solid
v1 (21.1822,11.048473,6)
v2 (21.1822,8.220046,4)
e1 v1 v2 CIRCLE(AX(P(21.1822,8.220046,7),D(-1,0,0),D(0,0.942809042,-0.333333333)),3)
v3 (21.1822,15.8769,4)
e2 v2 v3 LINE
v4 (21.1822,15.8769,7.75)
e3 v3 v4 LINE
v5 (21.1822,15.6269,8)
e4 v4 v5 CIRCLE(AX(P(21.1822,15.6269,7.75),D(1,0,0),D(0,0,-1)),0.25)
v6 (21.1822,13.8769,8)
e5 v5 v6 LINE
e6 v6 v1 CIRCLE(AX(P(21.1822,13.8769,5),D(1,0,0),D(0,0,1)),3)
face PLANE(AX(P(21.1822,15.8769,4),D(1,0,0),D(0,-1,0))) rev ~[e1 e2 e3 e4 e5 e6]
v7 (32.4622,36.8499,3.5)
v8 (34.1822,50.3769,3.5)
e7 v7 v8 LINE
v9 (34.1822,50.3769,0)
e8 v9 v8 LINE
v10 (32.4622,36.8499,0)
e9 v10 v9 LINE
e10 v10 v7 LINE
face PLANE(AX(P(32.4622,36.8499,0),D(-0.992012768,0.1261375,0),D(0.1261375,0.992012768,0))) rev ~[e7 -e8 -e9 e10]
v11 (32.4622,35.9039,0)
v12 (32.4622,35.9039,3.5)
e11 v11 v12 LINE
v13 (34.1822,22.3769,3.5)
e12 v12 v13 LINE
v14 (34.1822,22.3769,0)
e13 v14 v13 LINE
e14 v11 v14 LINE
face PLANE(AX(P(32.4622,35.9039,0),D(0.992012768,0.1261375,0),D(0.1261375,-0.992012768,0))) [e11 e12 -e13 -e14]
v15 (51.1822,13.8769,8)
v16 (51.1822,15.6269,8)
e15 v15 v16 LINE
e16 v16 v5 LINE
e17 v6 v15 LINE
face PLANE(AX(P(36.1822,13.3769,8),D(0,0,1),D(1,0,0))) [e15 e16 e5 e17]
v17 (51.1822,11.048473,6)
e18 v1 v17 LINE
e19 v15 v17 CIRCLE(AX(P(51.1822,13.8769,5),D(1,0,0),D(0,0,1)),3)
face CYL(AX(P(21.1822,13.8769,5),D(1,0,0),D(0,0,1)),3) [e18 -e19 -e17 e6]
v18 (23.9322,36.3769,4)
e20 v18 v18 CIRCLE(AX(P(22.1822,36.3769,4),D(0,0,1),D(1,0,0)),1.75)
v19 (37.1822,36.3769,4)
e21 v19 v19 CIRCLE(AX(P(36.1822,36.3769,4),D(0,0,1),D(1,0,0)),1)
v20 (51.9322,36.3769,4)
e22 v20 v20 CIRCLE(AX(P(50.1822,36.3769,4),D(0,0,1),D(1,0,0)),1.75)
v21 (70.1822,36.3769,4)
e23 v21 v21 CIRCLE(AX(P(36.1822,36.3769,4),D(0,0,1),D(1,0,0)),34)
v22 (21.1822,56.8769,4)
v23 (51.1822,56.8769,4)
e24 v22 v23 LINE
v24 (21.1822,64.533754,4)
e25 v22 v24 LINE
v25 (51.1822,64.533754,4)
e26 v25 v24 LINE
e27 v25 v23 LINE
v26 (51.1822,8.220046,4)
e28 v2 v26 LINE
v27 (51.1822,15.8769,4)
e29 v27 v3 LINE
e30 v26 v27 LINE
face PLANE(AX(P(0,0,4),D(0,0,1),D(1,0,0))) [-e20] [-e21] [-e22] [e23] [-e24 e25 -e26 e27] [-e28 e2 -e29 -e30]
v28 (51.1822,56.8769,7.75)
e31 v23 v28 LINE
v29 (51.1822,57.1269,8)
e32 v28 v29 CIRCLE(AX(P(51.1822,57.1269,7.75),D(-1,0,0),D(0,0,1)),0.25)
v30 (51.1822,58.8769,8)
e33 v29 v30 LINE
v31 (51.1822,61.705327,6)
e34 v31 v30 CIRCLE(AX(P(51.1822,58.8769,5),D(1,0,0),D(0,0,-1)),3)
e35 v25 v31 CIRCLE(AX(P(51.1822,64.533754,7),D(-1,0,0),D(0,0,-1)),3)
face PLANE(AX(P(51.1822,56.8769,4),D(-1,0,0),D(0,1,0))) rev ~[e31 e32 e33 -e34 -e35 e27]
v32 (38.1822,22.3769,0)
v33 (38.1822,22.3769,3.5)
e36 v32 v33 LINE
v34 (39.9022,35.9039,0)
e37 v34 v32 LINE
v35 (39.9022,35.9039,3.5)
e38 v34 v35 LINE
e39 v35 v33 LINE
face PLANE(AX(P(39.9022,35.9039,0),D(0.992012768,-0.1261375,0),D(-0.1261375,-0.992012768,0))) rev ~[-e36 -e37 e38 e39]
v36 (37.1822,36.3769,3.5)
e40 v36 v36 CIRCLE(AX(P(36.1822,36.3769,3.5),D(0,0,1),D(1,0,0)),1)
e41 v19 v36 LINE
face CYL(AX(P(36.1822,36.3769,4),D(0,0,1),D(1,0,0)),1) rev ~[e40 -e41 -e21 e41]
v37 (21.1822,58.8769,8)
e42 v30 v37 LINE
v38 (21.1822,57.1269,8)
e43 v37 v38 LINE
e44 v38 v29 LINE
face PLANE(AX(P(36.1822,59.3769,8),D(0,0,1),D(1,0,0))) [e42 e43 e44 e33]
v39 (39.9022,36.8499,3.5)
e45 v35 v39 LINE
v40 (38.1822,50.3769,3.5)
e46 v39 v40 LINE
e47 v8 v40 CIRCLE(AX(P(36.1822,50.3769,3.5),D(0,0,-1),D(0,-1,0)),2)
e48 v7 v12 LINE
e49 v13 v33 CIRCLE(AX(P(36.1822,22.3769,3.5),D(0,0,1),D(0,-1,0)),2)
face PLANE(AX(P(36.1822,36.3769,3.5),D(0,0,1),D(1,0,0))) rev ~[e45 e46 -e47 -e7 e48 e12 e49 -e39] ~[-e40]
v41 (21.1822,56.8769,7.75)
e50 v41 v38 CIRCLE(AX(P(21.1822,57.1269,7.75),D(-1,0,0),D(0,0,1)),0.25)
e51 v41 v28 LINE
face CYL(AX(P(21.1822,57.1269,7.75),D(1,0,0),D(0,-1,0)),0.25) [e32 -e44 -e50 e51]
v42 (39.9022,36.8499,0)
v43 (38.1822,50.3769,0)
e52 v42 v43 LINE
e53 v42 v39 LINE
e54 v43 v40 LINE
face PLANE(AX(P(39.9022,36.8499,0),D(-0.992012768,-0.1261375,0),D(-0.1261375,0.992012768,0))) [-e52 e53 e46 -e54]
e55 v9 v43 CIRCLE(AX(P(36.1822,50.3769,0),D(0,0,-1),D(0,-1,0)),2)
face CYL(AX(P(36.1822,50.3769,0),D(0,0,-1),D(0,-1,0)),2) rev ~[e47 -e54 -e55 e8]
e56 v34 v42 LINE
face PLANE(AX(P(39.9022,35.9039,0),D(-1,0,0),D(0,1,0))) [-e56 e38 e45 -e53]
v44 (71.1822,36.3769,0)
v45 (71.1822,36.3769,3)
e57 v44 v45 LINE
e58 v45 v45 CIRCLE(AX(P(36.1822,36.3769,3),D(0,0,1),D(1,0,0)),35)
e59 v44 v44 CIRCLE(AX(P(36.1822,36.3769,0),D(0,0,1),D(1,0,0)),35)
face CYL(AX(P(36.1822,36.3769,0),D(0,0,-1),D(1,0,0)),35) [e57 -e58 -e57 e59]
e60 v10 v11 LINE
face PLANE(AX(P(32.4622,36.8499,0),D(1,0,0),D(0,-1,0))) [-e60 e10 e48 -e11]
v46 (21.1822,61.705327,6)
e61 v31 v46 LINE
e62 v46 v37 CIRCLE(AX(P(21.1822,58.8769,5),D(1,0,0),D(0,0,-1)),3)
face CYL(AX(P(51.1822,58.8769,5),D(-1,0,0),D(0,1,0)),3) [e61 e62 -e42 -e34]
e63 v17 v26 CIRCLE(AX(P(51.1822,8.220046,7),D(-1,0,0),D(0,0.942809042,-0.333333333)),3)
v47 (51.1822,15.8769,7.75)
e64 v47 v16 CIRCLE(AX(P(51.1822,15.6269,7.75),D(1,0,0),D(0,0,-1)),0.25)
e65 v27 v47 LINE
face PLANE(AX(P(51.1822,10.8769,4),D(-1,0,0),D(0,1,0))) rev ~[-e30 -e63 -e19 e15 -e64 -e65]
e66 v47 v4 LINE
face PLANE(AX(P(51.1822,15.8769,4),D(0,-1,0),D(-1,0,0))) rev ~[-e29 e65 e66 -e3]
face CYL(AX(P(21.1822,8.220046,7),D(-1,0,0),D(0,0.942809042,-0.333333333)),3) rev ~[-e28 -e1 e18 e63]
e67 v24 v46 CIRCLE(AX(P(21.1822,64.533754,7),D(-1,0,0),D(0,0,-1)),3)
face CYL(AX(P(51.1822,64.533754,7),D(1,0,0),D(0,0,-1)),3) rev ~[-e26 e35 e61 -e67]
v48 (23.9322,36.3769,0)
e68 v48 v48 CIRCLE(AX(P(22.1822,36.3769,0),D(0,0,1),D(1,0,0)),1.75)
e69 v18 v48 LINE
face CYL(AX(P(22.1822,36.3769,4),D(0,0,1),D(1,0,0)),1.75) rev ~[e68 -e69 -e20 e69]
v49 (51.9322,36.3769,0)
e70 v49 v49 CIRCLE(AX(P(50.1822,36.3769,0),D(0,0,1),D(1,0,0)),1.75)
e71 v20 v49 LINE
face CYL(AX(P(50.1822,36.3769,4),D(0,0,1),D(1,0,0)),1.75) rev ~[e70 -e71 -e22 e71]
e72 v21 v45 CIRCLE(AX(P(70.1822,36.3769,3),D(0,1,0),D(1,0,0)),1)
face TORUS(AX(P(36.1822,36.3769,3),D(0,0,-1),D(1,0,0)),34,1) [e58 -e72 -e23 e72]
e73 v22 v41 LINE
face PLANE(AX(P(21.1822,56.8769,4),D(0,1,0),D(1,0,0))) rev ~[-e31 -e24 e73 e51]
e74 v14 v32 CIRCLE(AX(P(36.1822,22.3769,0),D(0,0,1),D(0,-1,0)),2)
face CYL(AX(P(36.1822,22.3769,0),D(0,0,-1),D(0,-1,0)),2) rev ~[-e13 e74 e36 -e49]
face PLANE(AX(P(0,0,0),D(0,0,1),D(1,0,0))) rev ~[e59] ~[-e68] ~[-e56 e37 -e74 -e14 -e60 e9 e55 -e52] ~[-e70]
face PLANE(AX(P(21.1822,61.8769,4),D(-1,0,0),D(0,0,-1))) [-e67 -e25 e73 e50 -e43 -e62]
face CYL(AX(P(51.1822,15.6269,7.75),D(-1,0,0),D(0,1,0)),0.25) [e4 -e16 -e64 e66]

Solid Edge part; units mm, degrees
sketch "Sketch1" plane through (0, 0, 0) normal (0, 0, 1) x (1, 0, 0)
  circle A0 centre (36.1822, 36.3769) radius 35
  circle A1 centre (36.1822, 36.3769) radius 35
extrude "Protrusion1" add sketch "Sketch1" along normal blind 4
sketch "Sketch2" plane through (36.1822, 36.3769, 4) normal (0, 0, 1) x (1, 0, 0)
  circle A0 centre (14, 0) radius 1.75
  circle A1 centre (-14, 0) radius 1.75
  circle A2 centre (0, 0) radius 1
  dimension "D1" = 14
  dimension "D2" = 14
  dimension "D3" = 3.5
  dimension "D4" = 2
extrude "Cutout1" cut sketch "Sketch2" against normal through all
sketch "Sketch3" plane through (36.1822, 36.3769, 0) normal (0, 0, -1) x (0, -1, 0)
  line L0 (0.473, 3.72) -> (14, 2)
  arc A0 (14, 2) -> (14, -2) centre (14, 0) cw
  line L1 (0.473, -3.72) -> (14, -2)
  line L2 (0.473, -3.72) -> (-0.473, -3.72)
  line L3 (-0.473, -3.72) -> (-14, -2)
  arc A1 (-14, 2) -> (-14, -2) centre (-14, 0) ccw
  line L4 (-0.473, 3.72) -> (-14, 2)
  line L5 (-0.473, 3.72) -> (0.473, 3.72)
  dimension "D1" = 7.5
  dimension "D2" = 2
  dimension "D3" = 14
extrude "Enlèvement_matière_2" cut sketch "Sketch3" against normal blind 3.5
sketch "Sketch4" plane through (36.1822, 36.3769, 4) normal (0, 0, 1) x (0, 1, 0)
  line L0 (20.5, -15) -> (25.5, -15)
  line L1 (25.5, -15) -> (25.5, 15)
  line L2 (25.5, 15) -> (20.5, 15)
  line L3 (20.5, 15) -> (20.5, -15)
  line L4 (-25.5, -15) -> (-20.5, -15)
  line L5 (-20.5, -15) -> (-20.5, 15)
  line L6 (-20.5, 15) -> (-25.5, 15)
  line L7 (-25.5, 15) -> (-25.5, -15)
  dimension "D1" = 41
  dimension "D2" = 5
  dimension "D3" = 30
  dimension "D4" = 20.5
  dimension "D5" = 20.5
  dimension "D6" = 15
extrude "Ajout_matière_2" add sketch "Sketch4" along normal blind 4
fillet "Congé_1" radius 0.25 2 edges at (36.1822, 56.8769, 8) (36.1822, 15.8769, 8)
fillet "Congé_2" radius 3 2 edges at (36.1822, 61.8769, 8) (36.1822, 10.8769, 8)
fillet "Congé_3" radius 3 2 edges at (36.1822, 61.8769, 4) (36.1822, 10.8769, 4)
fillet "Congé_4" radius 1 1 edges at (1.1822, 36.3769, 4)
properties part number "AC_1.02"
